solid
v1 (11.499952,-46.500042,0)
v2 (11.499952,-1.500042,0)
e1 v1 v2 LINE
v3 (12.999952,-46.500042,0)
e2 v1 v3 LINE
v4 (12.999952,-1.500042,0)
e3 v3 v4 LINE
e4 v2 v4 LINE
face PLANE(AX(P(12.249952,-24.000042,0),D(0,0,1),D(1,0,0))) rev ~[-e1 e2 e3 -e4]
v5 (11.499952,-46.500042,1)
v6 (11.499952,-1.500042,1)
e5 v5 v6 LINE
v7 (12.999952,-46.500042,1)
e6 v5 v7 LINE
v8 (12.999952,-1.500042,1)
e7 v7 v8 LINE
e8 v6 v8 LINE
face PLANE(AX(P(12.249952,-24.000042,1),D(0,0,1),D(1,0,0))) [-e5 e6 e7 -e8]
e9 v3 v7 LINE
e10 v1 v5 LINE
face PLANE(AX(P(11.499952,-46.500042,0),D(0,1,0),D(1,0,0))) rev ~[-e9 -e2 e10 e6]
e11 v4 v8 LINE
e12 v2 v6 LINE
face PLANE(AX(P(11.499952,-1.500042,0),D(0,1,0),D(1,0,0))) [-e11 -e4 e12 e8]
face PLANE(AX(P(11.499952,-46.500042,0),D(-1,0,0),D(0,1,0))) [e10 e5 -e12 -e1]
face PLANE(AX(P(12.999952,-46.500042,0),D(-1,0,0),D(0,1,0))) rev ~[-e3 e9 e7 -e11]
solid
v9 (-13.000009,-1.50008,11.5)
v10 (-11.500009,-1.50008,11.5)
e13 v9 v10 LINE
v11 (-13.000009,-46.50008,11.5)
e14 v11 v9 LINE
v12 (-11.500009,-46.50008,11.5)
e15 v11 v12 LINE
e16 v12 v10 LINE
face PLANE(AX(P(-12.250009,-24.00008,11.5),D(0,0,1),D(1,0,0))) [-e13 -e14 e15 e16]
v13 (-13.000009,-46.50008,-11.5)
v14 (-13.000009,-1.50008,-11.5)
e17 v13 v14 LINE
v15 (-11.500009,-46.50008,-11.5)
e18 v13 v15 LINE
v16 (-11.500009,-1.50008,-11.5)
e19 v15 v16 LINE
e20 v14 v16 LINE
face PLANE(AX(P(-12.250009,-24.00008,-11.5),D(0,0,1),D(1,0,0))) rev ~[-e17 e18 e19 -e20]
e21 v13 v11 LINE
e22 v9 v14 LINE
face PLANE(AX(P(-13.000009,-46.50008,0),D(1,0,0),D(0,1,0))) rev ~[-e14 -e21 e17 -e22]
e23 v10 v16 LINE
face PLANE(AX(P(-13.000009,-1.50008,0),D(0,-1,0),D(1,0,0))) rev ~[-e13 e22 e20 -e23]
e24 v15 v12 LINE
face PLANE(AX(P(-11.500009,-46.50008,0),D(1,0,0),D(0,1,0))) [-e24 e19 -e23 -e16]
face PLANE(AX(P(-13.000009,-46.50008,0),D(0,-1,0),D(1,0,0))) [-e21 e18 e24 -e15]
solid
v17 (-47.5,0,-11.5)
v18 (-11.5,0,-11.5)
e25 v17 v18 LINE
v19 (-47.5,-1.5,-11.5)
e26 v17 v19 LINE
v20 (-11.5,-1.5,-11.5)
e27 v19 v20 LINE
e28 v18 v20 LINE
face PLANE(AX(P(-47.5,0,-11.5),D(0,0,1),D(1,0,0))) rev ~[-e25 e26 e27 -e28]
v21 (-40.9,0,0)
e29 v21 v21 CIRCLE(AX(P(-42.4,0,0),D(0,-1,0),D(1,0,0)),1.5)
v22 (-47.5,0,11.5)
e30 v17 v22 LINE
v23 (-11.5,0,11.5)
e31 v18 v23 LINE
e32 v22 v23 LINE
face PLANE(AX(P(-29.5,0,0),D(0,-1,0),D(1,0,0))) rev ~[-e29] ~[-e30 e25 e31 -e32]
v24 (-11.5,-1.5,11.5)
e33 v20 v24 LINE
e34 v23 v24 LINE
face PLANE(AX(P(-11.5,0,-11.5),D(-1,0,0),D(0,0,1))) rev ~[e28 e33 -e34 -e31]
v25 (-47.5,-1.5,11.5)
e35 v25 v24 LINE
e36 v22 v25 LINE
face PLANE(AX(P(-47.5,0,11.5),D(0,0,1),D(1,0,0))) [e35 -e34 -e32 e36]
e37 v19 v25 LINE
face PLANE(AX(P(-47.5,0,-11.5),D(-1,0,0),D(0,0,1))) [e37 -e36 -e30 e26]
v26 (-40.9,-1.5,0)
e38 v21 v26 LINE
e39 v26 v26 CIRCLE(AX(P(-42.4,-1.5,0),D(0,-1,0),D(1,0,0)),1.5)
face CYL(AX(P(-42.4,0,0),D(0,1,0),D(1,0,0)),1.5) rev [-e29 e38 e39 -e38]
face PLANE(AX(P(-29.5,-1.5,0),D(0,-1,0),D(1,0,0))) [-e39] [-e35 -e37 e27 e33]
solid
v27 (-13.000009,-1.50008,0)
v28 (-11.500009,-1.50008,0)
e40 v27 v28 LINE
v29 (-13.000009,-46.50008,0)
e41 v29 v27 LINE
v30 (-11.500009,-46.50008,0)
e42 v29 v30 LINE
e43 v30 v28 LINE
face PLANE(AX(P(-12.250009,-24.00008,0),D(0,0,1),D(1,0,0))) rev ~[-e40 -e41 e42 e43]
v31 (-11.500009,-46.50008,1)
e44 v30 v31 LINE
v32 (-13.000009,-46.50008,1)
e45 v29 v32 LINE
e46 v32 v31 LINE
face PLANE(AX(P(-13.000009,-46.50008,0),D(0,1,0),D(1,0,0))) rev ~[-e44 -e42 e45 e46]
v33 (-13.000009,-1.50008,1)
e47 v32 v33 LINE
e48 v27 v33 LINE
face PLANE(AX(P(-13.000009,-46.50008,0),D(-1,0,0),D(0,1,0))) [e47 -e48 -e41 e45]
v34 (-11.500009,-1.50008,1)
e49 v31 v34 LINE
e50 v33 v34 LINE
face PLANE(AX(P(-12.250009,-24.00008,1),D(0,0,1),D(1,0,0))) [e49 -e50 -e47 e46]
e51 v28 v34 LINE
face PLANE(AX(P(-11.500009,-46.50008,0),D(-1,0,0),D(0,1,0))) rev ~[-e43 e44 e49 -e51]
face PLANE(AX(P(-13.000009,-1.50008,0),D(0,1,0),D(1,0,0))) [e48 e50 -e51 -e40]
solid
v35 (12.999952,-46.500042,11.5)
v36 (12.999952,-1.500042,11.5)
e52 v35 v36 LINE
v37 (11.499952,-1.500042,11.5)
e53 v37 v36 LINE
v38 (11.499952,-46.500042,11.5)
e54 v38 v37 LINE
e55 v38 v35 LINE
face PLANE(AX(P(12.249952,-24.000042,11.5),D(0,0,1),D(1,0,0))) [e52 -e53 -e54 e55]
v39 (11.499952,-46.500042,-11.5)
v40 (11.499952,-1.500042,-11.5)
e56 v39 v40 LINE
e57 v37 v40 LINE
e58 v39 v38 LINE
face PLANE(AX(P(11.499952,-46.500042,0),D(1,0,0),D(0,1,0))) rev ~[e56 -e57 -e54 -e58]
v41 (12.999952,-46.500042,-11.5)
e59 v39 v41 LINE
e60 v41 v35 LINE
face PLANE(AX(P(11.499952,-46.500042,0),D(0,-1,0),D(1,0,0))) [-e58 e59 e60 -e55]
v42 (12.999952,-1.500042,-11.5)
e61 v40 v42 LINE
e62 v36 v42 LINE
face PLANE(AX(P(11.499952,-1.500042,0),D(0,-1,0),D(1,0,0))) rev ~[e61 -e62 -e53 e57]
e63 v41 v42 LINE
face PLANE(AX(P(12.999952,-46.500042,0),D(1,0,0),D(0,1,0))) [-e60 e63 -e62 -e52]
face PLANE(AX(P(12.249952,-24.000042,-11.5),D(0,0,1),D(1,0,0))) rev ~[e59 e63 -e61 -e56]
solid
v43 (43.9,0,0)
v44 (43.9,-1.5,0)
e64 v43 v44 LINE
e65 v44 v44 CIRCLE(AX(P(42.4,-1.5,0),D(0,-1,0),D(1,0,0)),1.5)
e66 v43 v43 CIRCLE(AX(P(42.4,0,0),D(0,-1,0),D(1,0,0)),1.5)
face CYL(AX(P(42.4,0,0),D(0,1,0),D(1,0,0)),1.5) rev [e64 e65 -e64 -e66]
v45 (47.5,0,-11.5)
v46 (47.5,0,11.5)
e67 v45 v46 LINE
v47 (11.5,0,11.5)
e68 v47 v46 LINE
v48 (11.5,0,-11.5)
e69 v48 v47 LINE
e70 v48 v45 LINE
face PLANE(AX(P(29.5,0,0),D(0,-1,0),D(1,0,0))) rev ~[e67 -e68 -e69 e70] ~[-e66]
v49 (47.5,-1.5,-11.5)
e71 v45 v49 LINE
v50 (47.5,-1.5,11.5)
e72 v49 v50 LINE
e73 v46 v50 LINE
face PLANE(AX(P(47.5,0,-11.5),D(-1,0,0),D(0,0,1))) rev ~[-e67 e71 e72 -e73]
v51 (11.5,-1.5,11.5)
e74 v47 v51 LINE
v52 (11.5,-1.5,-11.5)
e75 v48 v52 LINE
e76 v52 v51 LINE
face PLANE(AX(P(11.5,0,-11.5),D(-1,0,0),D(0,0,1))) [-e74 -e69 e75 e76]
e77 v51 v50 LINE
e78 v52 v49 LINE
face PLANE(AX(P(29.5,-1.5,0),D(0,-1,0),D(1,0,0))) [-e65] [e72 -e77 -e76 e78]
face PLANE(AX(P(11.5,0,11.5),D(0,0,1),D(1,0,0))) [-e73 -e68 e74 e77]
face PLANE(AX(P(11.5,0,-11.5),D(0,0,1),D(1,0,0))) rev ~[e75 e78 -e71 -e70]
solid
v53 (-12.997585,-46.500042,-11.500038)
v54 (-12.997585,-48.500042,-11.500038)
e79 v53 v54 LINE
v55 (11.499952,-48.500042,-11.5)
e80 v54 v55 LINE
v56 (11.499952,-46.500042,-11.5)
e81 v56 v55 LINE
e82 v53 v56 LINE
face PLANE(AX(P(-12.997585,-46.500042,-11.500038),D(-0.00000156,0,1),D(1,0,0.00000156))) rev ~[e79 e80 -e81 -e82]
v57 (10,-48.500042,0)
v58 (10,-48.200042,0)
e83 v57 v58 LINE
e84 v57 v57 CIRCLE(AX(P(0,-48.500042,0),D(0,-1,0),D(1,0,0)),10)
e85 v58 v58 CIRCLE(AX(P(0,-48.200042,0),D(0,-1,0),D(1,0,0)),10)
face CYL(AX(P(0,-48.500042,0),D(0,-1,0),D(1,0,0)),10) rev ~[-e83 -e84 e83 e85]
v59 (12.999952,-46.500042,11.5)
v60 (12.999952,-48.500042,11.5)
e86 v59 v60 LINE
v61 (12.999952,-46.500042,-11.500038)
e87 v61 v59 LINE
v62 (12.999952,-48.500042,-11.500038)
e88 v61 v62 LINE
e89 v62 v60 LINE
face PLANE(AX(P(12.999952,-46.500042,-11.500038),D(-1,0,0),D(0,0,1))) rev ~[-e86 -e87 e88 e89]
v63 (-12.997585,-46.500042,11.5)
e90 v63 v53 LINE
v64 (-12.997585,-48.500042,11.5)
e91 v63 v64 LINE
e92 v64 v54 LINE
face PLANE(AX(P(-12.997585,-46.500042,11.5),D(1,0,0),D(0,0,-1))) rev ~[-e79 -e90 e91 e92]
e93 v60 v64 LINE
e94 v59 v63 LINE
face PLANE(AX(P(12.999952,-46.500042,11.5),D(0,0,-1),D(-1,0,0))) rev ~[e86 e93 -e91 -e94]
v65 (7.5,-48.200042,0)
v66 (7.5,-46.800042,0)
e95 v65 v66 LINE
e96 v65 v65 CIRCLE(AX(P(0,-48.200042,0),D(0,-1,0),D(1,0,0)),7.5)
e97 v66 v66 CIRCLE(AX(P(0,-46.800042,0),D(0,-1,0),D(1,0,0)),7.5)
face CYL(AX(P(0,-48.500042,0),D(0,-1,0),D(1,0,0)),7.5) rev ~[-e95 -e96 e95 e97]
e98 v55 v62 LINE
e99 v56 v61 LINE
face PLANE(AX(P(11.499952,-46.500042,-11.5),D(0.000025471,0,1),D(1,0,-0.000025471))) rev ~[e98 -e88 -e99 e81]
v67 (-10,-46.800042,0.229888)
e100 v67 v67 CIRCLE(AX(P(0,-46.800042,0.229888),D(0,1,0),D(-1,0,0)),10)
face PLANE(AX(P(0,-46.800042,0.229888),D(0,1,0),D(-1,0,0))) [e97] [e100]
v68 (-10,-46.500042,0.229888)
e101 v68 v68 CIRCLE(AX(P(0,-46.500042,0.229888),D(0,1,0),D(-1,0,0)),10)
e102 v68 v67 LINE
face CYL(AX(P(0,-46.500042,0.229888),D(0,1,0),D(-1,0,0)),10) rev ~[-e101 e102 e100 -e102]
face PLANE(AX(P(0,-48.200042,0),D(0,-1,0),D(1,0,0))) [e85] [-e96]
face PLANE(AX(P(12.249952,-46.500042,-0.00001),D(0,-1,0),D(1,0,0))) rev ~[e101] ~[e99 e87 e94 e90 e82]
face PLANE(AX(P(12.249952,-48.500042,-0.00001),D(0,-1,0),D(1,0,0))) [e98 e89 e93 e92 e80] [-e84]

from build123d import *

# Parameters (mm, degrees)
F0_W      = 36
F0_H      = 23
F0_R      = 1.5
F1_DEPTH  = 1.5
F2_W      = 1.5
F2_H      = 45
F3_DEPTH  = 11.5
F4_DEPTH  = 1
F6_DEPTH  = 2
F7_R      = 10
F7_R_2    = 7.5
F8_DEPTH  = 0.3
F9_DEPTH  = 2.2
F10_R     = 10
F10_R_2   = 7.5
F11_DEPTH = 0.3


# Not quite as in the source:
# - ends of sketch curves that miss each other by under 0.0002 mm in the source are joined


with BuildPart() as f1:
    # F0 (on Front) → F1 (new body)
    with BuildSketch(Plane.XZ):
        with Locations((-29.5, 0)):
            Rectangle(F0_W, F0_H)
        with Locations((-42.4, 0)):
            Circle(F0_R, mode=Mode.SUBTRACT)
    extrude(amount=F1_DEPTH)


with BuildPart() as f1b:
    # F0 (on Front) → F1, piece 2 (new body)
    with BuildSketch(Plane.XZ):
        with Locations((29.5, 0)):
            Rectangle(F0_W, F0_H)
        with Locations((42.4, 0)):
            Circle(F0_R, mode=Mode.SUBTRACT)
    extrude(amount=F1_DEPTH)


with BuildPart() as f3:
    # F2 (on Top) → F3 (new body, symmetric)
    with BuildSketch(Plane.XY):
        with Locations((12.2499515936, -24.0000421973)):
            Rectangle(F2_W, F2_H)
    extrude(amount=F3_DEPTH, both=True)


with BuildPart() as f3b:
    # F2 (on Top) → F3, piece 2 (new body, symmetric)
    with BuildSketch(Plane.XY):
        with Locations((-12.2500094585, -24.0000799907)):
            Rectangle(F2_W, F2_H)
    extrude(amount=F3_DEPTH, both=True)


with BuildPart() as f4:
    # F2 (on Top) → F4 (new body)
    with BuildSketch(Plane.XY):
        with Locations((-12.2500094585, -24.0000799907)):
            Rectangle(F2_W, F2_H)
    extrude(amount=F4_DEPTH)


with BuildPart() as f4b:
    # F2 (on Top) → F4, piece 2 (new body)
    with BuildSketch(Plane.XY):
        with Locations((12.2499515936, -24.0000421973)):
            Rectangle(F2_W, F2_H)
    extrude(amount=F4_DEPTH)


with BuildPart() as f6:
    # F5 (on face) → F6 (new body)
    with BuildSketch(Plane.XZ.offset(46.5000421973)):
        Polygon((12.9999515936, -11.5000382066), (12.9999515936, 11.5), (11.4999515936, 11.5), (11.4999515936, -11.5), align=None)
        Polygon((11.4999515936, -11.5), (11.4999515936, 11.5), (-12.9975853488, 11.5), (-12.9975853488, -11.5000382066), align=None)
    extrude(amount=F6_DEPTH)

    # F7 (on face) → F8 (cut)
    with BuildSketch(Plane.XZ.offset(48.5000421973)):
        Circle(F7_R)
        Circle(F7_R_2, mode=Mode.SUBTRACT)
    extrude(amount=-F8_DEPTH, mode=Mode.SUBTRACT)

    # F9 (cut): a face of the model
    f9_faces = [f6.faces().sort_by_distance(p)[0] for p in [
        (0, -48.5000421973, 0),
    ]]
    extrude(f9_faces, amount=-F9_DEPTH, mode=Mode.SUBTRACT)

    # F10 (on face) → F11 (cut)
    with BuildSketch(Plane(origin=(0, -46.5000421973, 0), x_dir=(-1, 0, 0), z_dir=(0, 1, 0))):
        with Locations((0, 0.2298883747)):
            Circle(F10_R)
        Circle(F10_R_2, mode=Mode.SUBTRACT)
    extrude(amount=-F11_DEPTH, mode=Mode.SUBTRACT)


solid = Compound([f1.part, f1b.part, f3.part, f3b.part, f4.part, f4b.part, f6.part])
